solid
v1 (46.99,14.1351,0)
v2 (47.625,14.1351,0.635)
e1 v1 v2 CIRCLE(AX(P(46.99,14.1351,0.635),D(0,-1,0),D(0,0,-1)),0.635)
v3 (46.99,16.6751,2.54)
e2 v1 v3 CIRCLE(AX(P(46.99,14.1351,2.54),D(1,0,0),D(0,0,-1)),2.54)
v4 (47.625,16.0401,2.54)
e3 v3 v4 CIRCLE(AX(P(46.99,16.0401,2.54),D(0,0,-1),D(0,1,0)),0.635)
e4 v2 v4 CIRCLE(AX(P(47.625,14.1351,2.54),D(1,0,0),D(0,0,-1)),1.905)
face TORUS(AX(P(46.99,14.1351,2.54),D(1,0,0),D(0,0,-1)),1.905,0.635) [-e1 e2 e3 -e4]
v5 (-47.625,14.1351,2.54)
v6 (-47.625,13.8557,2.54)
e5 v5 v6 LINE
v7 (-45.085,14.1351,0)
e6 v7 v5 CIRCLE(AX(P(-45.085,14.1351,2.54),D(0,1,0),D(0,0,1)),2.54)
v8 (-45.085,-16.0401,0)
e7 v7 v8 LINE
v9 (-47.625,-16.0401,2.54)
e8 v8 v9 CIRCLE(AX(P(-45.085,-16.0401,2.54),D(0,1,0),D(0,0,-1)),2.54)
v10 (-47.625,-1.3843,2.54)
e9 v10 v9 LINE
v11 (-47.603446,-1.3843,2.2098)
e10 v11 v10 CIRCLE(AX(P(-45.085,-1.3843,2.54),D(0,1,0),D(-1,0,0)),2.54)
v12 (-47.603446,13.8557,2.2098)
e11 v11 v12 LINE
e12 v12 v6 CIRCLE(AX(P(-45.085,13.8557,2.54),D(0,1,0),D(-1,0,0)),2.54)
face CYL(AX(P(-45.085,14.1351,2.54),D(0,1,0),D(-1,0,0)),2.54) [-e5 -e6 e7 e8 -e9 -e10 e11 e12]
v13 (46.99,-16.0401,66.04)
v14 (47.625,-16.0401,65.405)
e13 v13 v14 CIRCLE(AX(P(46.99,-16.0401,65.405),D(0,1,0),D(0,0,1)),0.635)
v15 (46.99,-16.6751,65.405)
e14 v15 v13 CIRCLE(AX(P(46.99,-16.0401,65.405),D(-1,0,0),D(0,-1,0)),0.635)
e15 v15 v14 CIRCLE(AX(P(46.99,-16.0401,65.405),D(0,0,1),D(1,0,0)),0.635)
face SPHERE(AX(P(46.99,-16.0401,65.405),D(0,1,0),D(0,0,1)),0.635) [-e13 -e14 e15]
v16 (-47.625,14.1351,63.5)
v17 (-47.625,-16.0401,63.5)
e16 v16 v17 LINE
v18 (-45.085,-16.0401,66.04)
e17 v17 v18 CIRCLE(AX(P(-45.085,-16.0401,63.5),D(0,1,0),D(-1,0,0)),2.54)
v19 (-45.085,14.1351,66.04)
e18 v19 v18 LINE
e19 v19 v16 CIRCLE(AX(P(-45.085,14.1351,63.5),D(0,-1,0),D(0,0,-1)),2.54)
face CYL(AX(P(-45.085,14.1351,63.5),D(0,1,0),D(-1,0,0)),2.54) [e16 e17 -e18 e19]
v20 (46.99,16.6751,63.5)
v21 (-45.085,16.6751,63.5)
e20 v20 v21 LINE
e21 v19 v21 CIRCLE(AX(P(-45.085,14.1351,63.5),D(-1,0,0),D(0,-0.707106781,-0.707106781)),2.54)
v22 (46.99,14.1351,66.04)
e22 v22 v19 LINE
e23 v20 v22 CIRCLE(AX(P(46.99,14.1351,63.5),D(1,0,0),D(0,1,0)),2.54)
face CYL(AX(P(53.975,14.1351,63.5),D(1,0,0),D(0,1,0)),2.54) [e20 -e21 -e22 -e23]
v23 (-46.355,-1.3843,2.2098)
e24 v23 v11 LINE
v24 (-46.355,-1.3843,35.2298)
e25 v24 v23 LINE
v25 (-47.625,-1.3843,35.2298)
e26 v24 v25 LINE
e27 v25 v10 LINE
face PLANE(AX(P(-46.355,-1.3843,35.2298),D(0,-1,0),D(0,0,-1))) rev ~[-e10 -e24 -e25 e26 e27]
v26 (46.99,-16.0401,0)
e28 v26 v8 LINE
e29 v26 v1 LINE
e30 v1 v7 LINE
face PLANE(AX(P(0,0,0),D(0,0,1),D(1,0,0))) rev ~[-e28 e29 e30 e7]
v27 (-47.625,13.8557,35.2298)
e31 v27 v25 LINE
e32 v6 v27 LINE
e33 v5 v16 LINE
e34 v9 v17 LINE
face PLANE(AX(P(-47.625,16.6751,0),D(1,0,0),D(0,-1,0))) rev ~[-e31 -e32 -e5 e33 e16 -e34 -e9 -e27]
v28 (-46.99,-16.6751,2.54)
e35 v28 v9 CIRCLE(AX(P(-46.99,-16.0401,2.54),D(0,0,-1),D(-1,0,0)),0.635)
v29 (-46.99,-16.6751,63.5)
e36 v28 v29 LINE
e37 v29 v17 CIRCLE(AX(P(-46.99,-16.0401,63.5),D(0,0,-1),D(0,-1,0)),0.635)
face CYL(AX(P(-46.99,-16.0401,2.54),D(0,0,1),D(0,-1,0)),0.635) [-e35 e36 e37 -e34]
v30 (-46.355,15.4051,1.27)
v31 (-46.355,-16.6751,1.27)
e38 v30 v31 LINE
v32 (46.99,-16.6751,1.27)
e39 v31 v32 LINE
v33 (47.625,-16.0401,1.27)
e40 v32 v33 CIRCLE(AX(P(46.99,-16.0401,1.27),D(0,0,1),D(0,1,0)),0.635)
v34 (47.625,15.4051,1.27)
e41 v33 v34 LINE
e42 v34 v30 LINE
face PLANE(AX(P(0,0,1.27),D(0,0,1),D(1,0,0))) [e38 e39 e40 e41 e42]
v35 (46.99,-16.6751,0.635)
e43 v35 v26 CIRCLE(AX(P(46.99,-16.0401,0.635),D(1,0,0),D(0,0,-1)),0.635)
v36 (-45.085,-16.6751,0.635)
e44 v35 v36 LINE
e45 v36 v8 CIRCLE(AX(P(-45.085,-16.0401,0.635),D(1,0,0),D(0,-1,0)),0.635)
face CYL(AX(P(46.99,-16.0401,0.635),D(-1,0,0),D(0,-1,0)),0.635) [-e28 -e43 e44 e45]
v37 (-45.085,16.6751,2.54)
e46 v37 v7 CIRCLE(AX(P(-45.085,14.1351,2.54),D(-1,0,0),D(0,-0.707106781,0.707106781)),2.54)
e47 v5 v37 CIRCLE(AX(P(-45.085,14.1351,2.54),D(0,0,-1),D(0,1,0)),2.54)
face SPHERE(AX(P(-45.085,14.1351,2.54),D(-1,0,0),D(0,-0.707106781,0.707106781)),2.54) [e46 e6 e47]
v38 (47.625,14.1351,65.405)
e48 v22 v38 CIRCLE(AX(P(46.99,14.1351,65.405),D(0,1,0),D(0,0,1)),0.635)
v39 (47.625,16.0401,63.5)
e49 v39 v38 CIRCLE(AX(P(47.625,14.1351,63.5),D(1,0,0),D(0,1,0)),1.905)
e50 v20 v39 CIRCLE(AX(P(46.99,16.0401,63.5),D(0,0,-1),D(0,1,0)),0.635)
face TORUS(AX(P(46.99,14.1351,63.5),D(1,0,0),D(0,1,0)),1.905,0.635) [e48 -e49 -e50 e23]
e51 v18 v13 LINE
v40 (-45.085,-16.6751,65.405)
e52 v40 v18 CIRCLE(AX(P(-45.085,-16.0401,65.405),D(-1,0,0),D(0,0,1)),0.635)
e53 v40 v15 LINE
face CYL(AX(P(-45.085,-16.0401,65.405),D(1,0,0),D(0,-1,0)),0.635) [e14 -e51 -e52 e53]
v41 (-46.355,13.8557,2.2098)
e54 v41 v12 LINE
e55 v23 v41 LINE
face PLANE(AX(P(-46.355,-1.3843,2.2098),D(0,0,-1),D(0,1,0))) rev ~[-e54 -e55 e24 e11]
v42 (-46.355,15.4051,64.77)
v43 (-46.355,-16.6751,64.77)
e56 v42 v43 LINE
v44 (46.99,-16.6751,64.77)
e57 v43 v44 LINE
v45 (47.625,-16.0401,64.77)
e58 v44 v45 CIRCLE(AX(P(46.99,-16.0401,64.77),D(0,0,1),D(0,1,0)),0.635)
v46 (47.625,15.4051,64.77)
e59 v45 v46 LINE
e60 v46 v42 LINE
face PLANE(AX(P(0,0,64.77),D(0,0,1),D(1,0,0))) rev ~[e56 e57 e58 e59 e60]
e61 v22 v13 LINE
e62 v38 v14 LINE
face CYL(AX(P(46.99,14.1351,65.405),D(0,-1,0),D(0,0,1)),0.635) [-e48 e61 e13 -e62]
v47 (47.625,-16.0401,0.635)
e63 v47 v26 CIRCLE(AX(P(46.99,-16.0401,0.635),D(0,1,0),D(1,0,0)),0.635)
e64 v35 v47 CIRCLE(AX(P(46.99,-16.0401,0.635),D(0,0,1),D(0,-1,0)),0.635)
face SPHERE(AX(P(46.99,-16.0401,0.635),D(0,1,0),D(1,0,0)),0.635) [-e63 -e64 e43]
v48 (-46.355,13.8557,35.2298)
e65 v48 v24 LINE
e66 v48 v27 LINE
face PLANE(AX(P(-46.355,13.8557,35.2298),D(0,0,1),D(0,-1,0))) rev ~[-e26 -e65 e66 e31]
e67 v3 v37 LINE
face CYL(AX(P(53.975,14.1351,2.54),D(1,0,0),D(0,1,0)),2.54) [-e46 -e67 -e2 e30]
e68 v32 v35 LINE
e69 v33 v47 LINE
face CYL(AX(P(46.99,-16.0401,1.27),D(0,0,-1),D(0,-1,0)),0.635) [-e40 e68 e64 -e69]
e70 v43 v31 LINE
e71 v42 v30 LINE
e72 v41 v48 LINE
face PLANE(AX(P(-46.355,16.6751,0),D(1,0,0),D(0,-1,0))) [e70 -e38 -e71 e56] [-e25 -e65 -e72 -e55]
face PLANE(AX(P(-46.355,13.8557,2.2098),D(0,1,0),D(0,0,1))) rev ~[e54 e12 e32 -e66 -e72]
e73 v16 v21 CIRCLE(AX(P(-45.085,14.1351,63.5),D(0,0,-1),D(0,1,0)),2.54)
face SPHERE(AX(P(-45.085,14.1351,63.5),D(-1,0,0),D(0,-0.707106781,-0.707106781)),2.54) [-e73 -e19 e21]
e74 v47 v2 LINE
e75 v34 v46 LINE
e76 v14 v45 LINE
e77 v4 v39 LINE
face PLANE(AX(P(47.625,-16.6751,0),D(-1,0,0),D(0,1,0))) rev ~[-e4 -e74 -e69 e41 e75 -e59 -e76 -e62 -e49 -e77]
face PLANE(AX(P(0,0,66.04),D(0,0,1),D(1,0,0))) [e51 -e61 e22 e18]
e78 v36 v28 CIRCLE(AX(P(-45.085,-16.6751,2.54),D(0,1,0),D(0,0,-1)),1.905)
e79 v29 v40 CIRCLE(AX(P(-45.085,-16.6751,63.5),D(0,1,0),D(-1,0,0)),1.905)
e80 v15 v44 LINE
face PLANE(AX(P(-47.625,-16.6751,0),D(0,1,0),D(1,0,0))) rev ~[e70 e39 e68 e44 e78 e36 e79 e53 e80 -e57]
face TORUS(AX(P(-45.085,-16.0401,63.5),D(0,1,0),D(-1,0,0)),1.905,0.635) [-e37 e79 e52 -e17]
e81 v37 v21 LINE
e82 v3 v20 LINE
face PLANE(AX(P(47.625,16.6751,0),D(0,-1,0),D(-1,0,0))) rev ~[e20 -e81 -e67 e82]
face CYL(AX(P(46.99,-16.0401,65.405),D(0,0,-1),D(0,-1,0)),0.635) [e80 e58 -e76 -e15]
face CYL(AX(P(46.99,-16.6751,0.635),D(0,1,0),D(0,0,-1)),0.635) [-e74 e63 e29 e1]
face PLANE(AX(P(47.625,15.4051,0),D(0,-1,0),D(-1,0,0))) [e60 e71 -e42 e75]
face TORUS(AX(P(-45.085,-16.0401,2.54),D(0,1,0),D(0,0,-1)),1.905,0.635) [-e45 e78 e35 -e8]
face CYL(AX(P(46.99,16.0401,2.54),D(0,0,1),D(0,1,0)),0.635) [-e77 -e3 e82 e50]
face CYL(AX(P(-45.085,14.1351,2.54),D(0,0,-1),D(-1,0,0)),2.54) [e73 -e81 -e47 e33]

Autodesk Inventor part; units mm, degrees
ref_plane "YZ Plane" through (0, 0, 0) normal (1, 0, 0) x (0, 1, 0)
ref_plane "XZ Plane" through (0, 0, 0) normal (0, 1, 0) x (-1, 0, 0)
ref_plane "XY Plane" through (0, 0, 0) normal (0, 0, 1) x (1, 0, 0)
sketch "Sketch1" plane through (0, 0, 0) normal (0, 0, 1) x (1, 0, 0)
  line L0 (-47.625, -16.6751) -> (47.625, -16.6751)
  line L1 (47.625, -16.6751) -> (47.625, 16.6751)
  line L2 (47.625, 16.6751) -> (-47.625, 16.6751)
  line L3 (-47.625, 16.6751) -> (-47.625, -16.6751)
  line L4 (-47.625, -16.6751) -> (47.625, 16.6751) construction
  line L5 (47.625, -16.6751) -> (-47.625, 16.6751) construction
  point P0 (0, 0)
  dimension "d0" = 95.25
  dimension "d1" = 33.3502
extrude "Extrusion1" add sketch "Sketch1" along normal blind 66.04
shell "Shell1" thickness 1.27 removed faces 2 at (47.625, -5.5584, 44.0267) at (-15.875, -16.6751, 44.0267)
sketch "Sketch2" plane through (-46.355, -16.6751, 1.27) normal (1, 0, 0) x (0, 0, -1)
  line L0 (0, 32.0802) -> (0, 0) projected
  line L1 (0, 0) -> (-63.5, 0) projected
  line L2 (-33.9598, 15.2908) -> (-0.9398, 15.2908)
  line L3 (-0.9398, 15.2908) -> (-0.9398, 30.5308)
  line L4 (-0.9398, 30.5308) -> (-33.9598, 30.5308)
  line L5 (-33.9598, 30.5308) -> (-33.9598, 15.2908)
  line L6 (-33.9598, 15.2908) -> (-0.9398, 30.5308) construction
  line L7 (-0.9398, 15.2908) -> (-33.9598, 30.5308) construction
  point P0 (1.27, 16.6751)
  point P1 (-17.4498, 22.9108)
  dimension "d5" = 17.4498
  dimension "d6" = 22.9108
  dimension "d13" = 33.02
  dimension "d14" = 15.24
extrude "Extrusion2" cut sketch "Sketch2" against normal up to surface (1.27 mm away)
fillet "Fillet1" radius 2.54 5 edges at (0, 16.6751, 66.04) (-47.625, 16.6751, 33.02) (0, 16.6751, 0) (-47.625, 0, 0) (-47.625, 0, 66.04)
fillet "Fillet2" radius 0.635 5 edges at (47.625, -1.27, 0) (47.625, 15.9312, 0.7439) (47.625, 16.6751, 33.02) (47.625, 15.9312, 65.2961) (47.625, -1.27, 66.04)
fillet "Fillet3" radius 0.635 9 edges at (47.439, -16.6751, 65.854) (47.625, -16.6751, 65.0875) (-46.8811, -16.6751, 65.2961) (-47.625, -16.6751, 33.02) (-46.8811, -16.6751, 0.7439) (0.9525, -16.6751, 0) (47.439, -16.6751, 0.186) (47.625, -16.6751, 0.9525) (0.9525, -16.6751, 66.04)
properties part number "SPO2_cover"
